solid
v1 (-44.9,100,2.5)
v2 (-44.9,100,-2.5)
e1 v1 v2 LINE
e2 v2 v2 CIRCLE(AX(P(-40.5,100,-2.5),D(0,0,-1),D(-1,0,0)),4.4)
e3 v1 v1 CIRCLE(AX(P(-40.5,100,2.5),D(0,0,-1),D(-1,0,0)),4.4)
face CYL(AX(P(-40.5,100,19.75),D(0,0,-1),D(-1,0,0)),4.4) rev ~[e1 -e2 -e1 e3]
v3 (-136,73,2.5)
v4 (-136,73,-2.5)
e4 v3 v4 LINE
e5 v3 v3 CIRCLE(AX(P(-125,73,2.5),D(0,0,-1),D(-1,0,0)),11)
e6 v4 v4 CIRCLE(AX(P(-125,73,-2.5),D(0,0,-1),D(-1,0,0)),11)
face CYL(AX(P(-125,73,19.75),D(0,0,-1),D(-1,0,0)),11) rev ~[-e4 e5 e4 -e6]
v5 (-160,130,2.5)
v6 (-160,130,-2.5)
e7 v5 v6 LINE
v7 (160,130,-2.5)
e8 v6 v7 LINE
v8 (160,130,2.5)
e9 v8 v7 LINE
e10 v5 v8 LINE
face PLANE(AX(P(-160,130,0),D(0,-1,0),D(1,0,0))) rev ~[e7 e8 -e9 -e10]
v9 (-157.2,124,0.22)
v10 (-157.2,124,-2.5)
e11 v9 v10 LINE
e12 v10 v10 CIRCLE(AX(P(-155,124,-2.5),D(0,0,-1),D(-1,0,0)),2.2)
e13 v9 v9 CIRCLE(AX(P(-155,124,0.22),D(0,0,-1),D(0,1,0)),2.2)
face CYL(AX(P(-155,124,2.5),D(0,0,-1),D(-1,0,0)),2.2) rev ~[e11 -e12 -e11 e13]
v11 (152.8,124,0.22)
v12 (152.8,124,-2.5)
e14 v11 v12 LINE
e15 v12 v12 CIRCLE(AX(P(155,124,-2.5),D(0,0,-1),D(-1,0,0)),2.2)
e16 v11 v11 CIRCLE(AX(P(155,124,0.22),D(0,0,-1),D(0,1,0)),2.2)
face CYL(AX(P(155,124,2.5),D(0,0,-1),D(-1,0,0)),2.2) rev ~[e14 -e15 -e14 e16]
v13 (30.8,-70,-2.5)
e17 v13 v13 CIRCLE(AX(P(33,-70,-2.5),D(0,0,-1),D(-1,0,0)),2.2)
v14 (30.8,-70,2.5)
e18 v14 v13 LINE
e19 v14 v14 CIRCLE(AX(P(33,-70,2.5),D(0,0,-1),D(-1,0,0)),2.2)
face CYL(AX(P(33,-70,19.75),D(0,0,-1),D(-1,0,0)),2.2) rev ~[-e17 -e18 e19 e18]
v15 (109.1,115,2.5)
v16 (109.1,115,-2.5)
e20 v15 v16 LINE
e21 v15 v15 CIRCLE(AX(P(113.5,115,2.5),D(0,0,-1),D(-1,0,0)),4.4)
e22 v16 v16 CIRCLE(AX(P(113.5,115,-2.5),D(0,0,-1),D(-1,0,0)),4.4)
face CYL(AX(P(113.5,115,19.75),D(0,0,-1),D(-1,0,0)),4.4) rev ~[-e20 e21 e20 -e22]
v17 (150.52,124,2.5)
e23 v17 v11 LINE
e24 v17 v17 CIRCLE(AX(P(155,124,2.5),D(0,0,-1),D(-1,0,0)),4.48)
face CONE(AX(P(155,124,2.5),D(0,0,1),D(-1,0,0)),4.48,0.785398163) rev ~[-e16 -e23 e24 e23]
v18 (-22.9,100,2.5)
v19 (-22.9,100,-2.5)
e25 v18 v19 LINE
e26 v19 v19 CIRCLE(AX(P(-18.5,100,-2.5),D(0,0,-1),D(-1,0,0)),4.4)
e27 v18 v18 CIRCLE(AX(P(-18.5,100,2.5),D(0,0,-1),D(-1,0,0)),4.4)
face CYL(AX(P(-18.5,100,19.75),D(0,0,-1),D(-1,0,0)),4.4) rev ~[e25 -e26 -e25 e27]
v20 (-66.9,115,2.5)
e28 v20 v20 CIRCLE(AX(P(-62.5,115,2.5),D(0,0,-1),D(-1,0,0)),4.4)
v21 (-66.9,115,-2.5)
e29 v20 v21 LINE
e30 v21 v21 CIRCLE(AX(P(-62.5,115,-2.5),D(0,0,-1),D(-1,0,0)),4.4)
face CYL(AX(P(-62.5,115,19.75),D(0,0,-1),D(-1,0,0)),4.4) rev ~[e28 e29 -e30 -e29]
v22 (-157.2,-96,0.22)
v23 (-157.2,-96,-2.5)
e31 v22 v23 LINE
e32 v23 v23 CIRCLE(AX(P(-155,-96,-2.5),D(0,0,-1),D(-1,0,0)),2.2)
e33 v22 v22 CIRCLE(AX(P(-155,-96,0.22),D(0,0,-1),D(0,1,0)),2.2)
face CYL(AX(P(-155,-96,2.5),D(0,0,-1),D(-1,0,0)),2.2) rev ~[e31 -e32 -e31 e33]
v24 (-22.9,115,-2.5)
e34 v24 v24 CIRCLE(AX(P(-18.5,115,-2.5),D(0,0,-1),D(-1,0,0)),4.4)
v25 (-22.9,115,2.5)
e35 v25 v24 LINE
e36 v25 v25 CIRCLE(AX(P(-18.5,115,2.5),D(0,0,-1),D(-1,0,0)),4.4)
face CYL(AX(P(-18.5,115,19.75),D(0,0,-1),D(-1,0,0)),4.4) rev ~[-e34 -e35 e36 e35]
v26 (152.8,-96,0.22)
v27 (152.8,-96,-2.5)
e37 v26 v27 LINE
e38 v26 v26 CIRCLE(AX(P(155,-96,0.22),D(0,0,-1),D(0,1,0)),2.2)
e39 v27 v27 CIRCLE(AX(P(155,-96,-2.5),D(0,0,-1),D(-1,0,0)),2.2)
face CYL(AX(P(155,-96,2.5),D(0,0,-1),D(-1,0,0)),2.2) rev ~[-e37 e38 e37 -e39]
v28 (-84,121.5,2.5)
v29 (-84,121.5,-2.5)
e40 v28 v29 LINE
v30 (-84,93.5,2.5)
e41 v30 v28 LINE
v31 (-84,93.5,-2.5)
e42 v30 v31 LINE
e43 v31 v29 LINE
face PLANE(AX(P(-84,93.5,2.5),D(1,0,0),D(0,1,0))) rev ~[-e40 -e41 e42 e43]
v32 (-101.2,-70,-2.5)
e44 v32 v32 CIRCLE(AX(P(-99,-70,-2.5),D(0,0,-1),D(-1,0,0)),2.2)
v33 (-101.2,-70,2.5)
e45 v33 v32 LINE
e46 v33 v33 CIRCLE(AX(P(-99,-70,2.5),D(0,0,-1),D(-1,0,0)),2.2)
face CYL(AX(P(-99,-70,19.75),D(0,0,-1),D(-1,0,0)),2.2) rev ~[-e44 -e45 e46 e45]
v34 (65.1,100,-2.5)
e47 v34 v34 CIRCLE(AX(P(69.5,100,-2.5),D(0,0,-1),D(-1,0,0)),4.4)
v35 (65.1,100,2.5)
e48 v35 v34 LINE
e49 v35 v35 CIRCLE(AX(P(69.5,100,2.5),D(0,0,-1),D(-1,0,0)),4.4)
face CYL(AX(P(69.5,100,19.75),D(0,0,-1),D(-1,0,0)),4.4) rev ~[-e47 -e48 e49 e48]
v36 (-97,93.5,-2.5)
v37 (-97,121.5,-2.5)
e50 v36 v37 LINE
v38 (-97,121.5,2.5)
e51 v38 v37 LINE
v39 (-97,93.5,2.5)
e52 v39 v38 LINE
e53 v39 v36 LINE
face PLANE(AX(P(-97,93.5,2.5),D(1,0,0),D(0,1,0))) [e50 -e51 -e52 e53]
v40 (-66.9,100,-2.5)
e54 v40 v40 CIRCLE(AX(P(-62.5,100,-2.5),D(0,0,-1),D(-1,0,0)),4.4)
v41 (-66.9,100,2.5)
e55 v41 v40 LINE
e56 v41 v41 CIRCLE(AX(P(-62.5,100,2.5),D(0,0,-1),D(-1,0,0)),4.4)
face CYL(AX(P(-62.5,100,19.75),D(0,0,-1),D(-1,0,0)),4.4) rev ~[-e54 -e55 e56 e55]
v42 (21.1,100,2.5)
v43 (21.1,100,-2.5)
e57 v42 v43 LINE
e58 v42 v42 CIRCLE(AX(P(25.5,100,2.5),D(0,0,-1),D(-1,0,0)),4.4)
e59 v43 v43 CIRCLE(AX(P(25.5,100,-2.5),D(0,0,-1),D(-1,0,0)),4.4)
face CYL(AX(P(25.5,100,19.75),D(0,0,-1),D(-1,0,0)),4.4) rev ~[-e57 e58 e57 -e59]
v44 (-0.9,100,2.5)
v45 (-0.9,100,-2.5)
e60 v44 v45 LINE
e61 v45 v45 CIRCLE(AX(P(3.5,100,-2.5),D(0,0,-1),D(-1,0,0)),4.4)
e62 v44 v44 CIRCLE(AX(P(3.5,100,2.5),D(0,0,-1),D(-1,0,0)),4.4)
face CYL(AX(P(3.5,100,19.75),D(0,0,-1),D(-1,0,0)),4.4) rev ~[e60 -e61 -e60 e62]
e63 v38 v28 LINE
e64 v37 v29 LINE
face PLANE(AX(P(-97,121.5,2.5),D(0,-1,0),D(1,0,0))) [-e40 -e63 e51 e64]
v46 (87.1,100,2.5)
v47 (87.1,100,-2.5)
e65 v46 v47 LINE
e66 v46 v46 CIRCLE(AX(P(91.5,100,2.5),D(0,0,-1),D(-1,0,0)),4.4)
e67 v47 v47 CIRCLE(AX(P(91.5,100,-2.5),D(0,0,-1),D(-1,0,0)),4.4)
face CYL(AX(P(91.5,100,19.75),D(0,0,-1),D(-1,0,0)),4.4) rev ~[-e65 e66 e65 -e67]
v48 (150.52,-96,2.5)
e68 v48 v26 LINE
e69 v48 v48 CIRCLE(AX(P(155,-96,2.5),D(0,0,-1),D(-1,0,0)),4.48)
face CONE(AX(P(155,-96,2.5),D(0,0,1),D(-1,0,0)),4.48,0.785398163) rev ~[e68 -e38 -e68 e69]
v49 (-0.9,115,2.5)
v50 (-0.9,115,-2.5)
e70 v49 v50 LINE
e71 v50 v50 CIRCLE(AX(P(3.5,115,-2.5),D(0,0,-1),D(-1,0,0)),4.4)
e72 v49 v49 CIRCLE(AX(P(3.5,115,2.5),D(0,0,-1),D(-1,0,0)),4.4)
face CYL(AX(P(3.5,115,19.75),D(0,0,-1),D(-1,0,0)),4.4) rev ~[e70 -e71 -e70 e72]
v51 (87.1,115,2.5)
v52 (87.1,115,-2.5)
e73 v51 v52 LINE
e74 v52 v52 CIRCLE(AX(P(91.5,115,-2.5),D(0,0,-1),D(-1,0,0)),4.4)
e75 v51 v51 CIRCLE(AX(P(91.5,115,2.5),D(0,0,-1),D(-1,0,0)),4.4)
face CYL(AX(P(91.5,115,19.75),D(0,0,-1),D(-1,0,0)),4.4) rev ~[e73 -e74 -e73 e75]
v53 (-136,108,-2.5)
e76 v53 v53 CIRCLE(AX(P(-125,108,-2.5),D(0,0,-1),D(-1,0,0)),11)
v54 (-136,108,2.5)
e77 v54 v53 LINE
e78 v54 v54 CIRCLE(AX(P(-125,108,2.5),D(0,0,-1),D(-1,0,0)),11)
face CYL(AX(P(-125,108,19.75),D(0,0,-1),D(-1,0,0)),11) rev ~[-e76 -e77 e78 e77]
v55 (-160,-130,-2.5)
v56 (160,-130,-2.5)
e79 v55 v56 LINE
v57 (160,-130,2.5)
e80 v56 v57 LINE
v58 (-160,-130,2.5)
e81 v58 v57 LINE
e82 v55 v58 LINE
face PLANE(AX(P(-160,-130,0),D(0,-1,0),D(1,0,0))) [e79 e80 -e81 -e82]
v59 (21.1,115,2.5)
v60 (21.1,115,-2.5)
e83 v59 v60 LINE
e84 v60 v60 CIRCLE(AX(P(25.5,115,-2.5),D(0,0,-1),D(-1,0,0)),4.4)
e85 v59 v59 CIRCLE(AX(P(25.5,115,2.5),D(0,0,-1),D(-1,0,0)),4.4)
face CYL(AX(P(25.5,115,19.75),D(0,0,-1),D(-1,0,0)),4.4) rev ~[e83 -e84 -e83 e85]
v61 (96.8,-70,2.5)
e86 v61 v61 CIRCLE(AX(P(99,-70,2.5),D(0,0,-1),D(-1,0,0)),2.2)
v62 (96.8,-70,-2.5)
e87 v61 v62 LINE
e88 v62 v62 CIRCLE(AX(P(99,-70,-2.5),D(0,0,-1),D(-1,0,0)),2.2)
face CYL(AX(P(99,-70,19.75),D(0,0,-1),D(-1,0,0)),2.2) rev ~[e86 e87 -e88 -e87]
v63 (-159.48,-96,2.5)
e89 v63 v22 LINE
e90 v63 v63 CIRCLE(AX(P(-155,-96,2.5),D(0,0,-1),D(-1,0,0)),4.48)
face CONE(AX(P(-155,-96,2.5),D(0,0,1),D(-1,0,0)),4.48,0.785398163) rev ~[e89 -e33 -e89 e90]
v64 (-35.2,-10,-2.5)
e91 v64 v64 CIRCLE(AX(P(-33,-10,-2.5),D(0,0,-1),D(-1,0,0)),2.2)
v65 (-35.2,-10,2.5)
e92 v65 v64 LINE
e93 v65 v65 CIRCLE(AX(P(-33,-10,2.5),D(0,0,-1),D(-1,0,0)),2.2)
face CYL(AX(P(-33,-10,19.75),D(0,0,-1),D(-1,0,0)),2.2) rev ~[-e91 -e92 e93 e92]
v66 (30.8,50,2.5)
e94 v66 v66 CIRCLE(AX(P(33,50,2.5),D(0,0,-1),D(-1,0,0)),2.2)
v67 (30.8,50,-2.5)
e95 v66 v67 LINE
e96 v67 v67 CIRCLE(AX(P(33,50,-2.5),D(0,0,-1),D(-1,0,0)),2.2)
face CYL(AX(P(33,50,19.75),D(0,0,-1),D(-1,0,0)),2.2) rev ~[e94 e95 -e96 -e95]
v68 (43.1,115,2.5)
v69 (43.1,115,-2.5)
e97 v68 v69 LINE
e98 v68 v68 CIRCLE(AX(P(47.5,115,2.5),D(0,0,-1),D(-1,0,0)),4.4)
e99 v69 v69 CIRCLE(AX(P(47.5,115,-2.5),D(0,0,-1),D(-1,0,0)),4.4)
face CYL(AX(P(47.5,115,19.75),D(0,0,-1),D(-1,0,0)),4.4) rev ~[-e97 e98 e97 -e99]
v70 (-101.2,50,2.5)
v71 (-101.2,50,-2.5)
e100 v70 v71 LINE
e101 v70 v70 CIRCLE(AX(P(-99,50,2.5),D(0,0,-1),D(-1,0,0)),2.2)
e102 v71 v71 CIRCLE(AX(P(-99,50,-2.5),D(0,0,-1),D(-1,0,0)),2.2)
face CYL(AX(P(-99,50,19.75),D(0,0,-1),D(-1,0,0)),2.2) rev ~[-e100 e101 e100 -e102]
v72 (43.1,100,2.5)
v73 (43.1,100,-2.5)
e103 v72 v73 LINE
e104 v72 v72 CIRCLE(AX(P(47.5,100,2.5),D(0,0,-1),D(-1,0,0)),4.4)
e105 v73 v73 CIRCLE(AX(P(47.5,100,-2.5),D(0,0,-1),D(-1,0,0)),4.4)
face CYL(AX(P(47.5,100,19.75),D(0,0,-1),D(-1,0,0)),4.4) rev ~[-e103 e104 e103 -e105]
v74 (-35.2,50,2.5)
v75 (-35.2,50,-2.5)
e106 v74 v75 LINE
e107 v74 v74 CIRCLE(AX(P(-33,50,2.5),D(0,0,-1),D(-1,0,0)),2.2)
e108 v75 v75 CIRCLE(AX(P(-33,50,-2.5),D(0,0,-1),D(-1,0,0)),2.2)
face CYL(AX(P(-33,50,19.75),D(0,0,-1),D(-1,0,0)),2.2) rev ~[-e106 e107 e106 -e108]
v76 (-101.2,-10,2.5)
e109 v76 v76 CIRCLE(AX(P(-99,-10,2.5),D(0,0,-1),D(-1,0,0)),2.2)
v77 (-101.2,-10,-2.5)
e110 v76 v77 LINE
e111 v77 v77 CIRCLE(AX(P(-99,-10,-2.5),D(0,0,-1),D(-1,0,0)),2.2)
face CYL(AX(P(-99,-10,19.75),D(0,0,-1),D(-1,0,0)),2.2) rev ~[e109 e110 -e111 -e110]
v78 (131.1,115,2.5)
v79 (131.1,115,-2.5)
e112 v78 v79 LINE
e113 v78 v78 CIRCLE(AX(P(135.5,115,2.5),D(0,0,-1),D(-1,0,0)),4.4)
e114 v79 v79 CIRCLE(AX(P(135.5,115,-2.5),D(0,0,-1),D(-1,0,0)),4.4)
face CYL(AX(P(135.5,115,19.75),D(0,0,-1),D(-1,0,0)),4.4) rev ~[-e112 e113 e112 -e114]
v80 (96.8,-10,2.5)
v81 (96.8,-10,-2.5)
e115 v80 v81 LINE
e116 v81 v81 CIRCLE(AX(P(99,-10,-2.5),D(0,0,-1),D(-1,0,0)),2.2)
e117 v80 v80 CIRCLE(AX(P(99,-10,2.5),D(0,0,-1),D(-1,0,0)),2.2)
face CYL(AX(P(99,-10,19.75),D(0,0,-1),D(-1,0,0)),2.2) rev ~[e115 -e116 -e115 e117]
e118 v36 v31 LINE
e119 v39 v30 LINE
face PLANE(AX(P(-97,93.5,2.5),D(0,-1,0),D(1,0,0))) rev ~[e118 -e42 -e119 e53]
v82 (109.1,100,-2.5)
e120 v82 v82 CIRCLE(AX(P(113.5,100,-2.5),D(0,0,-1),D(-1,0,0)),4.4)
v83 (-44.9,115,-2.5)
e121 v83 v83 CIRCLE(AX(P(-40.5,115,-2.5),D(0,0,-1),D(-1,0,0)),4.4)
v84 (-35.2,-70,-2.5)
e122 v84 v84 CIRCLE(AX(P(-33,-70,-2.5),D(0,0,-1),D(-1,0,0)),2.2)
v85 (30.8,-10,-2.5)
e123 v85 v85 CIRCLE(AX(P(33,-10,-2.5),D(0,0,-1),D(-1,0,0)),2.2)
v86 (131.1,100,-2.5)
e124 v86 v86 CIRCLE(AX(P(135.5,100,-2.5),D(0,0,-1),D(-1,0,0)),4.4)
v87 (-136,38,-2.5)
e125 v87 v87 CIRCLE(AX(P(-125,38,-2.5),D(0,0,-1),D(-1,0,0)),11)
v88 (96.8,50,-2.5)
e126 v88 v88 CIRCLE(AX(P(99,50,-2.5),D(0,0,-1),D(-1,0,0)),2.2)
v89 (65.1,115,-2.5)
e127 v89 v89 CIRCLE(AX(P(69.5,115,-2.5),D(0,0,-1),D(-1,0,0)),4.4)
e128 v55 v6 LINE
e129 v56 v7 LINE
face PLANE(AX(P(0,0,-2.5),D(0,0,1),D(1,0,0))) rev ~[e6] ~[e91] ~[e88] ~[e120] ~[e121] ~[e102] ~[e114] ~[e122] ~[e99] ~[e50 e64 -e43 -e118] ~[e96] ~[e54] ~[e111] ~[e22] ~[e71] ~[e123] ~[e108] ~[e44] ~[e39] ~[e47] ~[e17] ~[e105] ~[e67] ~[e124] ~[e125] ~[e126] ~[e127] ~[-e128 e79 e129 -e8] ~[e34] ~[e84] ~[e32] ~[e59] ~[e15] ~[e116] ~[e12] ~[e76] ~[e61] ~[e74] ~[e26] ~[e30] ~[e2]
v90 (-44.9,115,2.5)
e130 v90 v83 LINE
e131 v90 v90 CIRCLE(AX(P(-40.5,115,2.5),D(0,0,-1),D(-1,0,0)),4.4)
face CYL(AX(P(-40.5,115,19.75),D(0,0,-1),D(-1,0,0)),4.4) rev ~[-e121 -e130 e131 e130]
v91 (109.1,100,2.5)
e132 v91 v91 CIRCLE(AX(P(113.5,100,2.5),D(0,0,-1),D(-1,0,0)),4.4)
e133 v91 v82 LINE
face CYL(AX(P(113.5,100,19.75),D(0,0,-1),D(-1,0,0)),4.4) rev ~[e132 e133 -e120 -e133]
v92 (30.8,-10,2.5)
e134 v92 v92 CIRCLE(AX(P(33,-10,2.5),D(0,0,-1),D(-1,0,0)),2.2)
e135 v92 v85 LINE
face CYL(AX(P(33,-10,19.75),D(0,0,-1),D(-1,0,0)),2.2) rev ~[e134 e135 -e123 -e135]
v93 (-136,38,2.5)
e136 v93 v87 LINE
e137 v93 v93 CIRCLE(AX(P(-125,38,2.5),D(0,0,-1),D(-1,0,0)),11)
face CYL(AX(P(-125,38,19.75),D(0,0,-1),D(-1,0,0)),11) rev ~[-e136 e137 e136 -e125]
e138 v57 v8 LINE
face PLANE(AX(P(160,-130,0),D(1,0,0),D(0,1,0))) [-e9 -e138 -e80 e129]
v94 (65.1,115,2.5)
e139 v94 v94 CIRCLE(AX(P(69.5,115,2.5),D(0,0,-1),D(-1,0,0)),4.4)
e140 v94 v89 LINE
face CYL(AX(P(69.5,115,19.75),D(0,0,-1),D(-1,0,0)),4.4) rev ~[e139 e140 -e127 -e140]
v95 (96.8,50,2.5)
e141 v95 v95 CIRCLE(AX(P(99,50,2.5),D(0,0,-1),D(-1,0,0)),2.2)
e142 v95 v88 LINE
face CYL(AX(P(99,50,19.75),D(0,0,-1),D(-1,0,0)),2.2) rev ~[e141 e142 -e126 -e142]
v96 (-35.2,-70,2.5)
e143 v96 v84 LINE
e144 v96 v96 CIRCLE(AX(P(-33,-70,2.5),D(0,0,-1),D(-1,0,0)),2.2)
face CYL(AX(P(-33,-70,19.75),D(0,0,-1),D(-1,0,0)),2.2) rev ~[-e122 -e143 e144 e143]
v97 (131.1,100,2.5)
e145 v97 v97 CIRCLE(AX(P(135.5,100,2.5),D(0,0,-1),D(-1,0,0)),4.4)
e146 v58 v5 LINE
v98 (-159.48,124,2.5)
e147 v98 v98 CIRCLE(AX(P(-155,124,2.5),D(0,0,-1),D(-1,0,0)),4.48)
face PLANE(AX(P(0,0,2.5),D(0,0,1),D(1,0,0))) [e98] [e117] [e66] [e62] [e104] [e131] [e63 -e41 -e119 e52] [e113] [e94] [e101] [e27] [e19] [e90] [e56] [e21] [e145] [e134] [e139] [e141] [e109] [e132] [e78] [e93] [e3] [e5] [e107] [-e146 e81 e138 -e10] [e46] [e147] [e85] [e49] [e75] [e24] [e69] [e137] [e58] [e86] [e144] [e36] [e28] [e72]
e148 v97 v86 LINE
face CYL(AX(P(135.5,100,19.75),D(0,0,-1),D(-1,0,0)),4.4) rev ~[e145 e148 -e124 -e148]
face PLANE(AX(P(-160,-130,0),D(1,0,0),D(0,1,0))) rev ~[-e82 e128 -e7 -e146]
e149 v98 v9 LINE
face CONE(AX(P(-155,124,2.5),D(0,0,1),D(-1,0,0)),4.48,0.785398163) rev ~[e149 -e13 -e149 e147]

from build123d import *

# Parameters (mm, degrees)
F0_W           = 320
F0_H           = 260
F1_DEPTH       = 2.5
F3_D           = 4.4
F3_DEPTH       = 17.25
F3_CSINK_D     = 8.96
F3_CSINK_ANGLE = 90
F3_TIP         = 1.3218933619
F5_D           = 8.8
F5_DEPTH       = 17.25
F5_TIP         = 2.6437867237
F7_D           = 4.4
F7_DEPTH       = 17.25
F7_TIP         = 1.3218933619
F9_D           = 22
F9_DEPTH       = 17.25
F9_TIP         = 6.6094668093
F10_W          = 13
F10_H          = 28
F11_DEPTH      = 25


# Not quite as in the source:
# - a feature names something its author has since deleted; it is built from what else it names


with BuildPart() as f1:
    # F0 (on Top) → F1 (new body, symmetric)
    with BuildSketch(Plane.XY):
        Rectangle(F0_W, F0_H)
    extrude(amount=F1_DEPTH, both=True)

    # F3
    with Locations(Plane.XY.offset(2.5)):
        with Locations((-155, -96), (-155, 124), (155, 124), (155, -96)):
            CounterSinkHole(F3_D / 2, F3_CSINK_D / 2, depth=F3_DEPTH, counter_sink_angle=F3_CSINK_ANGLE)
            with Locations((0, 0, -(F3_DEPTH + F3_TIP / 2))):  # 118° drill point
                Cone(0, F3_D / 2, F3_TIP, mode=Mode.SUBTRACT)

    # F5
    with Locations(Plane.XY.offset(2.5)):
        with Locations((-62.5, 115), (-62.5, 100), (-40.5, 115), (-40.5, 100), (-18.5, 115), (3.5, 100), (3.5, 115), (-18.5, 100), (25.5, 100), (25.5, 115), (47.5, 115), (69.5, 115), (91.5, 115), (91.5, 100), (113.5, 100), (113.5, 115), (47.5, 100), (69.5, 100), (135.5, 115), (135.5, 100)):
            Hole(F5_D / 2, depth=F5_DEPTH)
            with Locations((0, 0, -(F5_DEPTH + F5_TIP / 2))):  # 118° drill point
                Cone(0, F5_D / 2, F5_TIP, mode=Mode.SUBTRACT)

    # F7
    with Locations(Plane.XY.offset(2.5)):
        with Locations((-99, 50), (-99, -10), (-99, -70), (-33, -70), (-33, -10), (-33, 50), (33, 50), (99, 50), (99, -10), (33, -10), (33, -70), (99, -70)):
            Hole(F7_D / 2, depth=F7_DEPTH)
            with Locations((0, 0, -(F7_DEPTH + F7_TIP / 2))):  # 118° drill point
                Cone(0, F7_D / 2, F7_TIP, mode=Mode.SUBTRACT)

    # F9
    with Locations(Plane.XY.offset(2.5)):
        with Locations((-125, 108), (-125, 73), (-125, 38)):
            Hole(F9_D / 2, depth=F9_DEPTH)
            with Locations((0, 0, -(F9_DEPTH + F9_TIP / 2))):  # 118° drill point
                Cone(0, F9_D / 2, F9_TIP, mode=Mode.SUBTRACT)

    # F10 (on face) → F11 (cut)
    with BuildSketch(Plane.XY.offset(2.5)):
        with Locations((-90.5, 107.5)):
            Rectangle(F10_W, F10_H)
    extrude(amount=-F11_DEPTH, mode=Mode.SUBTRACT)


solid = f1.part
